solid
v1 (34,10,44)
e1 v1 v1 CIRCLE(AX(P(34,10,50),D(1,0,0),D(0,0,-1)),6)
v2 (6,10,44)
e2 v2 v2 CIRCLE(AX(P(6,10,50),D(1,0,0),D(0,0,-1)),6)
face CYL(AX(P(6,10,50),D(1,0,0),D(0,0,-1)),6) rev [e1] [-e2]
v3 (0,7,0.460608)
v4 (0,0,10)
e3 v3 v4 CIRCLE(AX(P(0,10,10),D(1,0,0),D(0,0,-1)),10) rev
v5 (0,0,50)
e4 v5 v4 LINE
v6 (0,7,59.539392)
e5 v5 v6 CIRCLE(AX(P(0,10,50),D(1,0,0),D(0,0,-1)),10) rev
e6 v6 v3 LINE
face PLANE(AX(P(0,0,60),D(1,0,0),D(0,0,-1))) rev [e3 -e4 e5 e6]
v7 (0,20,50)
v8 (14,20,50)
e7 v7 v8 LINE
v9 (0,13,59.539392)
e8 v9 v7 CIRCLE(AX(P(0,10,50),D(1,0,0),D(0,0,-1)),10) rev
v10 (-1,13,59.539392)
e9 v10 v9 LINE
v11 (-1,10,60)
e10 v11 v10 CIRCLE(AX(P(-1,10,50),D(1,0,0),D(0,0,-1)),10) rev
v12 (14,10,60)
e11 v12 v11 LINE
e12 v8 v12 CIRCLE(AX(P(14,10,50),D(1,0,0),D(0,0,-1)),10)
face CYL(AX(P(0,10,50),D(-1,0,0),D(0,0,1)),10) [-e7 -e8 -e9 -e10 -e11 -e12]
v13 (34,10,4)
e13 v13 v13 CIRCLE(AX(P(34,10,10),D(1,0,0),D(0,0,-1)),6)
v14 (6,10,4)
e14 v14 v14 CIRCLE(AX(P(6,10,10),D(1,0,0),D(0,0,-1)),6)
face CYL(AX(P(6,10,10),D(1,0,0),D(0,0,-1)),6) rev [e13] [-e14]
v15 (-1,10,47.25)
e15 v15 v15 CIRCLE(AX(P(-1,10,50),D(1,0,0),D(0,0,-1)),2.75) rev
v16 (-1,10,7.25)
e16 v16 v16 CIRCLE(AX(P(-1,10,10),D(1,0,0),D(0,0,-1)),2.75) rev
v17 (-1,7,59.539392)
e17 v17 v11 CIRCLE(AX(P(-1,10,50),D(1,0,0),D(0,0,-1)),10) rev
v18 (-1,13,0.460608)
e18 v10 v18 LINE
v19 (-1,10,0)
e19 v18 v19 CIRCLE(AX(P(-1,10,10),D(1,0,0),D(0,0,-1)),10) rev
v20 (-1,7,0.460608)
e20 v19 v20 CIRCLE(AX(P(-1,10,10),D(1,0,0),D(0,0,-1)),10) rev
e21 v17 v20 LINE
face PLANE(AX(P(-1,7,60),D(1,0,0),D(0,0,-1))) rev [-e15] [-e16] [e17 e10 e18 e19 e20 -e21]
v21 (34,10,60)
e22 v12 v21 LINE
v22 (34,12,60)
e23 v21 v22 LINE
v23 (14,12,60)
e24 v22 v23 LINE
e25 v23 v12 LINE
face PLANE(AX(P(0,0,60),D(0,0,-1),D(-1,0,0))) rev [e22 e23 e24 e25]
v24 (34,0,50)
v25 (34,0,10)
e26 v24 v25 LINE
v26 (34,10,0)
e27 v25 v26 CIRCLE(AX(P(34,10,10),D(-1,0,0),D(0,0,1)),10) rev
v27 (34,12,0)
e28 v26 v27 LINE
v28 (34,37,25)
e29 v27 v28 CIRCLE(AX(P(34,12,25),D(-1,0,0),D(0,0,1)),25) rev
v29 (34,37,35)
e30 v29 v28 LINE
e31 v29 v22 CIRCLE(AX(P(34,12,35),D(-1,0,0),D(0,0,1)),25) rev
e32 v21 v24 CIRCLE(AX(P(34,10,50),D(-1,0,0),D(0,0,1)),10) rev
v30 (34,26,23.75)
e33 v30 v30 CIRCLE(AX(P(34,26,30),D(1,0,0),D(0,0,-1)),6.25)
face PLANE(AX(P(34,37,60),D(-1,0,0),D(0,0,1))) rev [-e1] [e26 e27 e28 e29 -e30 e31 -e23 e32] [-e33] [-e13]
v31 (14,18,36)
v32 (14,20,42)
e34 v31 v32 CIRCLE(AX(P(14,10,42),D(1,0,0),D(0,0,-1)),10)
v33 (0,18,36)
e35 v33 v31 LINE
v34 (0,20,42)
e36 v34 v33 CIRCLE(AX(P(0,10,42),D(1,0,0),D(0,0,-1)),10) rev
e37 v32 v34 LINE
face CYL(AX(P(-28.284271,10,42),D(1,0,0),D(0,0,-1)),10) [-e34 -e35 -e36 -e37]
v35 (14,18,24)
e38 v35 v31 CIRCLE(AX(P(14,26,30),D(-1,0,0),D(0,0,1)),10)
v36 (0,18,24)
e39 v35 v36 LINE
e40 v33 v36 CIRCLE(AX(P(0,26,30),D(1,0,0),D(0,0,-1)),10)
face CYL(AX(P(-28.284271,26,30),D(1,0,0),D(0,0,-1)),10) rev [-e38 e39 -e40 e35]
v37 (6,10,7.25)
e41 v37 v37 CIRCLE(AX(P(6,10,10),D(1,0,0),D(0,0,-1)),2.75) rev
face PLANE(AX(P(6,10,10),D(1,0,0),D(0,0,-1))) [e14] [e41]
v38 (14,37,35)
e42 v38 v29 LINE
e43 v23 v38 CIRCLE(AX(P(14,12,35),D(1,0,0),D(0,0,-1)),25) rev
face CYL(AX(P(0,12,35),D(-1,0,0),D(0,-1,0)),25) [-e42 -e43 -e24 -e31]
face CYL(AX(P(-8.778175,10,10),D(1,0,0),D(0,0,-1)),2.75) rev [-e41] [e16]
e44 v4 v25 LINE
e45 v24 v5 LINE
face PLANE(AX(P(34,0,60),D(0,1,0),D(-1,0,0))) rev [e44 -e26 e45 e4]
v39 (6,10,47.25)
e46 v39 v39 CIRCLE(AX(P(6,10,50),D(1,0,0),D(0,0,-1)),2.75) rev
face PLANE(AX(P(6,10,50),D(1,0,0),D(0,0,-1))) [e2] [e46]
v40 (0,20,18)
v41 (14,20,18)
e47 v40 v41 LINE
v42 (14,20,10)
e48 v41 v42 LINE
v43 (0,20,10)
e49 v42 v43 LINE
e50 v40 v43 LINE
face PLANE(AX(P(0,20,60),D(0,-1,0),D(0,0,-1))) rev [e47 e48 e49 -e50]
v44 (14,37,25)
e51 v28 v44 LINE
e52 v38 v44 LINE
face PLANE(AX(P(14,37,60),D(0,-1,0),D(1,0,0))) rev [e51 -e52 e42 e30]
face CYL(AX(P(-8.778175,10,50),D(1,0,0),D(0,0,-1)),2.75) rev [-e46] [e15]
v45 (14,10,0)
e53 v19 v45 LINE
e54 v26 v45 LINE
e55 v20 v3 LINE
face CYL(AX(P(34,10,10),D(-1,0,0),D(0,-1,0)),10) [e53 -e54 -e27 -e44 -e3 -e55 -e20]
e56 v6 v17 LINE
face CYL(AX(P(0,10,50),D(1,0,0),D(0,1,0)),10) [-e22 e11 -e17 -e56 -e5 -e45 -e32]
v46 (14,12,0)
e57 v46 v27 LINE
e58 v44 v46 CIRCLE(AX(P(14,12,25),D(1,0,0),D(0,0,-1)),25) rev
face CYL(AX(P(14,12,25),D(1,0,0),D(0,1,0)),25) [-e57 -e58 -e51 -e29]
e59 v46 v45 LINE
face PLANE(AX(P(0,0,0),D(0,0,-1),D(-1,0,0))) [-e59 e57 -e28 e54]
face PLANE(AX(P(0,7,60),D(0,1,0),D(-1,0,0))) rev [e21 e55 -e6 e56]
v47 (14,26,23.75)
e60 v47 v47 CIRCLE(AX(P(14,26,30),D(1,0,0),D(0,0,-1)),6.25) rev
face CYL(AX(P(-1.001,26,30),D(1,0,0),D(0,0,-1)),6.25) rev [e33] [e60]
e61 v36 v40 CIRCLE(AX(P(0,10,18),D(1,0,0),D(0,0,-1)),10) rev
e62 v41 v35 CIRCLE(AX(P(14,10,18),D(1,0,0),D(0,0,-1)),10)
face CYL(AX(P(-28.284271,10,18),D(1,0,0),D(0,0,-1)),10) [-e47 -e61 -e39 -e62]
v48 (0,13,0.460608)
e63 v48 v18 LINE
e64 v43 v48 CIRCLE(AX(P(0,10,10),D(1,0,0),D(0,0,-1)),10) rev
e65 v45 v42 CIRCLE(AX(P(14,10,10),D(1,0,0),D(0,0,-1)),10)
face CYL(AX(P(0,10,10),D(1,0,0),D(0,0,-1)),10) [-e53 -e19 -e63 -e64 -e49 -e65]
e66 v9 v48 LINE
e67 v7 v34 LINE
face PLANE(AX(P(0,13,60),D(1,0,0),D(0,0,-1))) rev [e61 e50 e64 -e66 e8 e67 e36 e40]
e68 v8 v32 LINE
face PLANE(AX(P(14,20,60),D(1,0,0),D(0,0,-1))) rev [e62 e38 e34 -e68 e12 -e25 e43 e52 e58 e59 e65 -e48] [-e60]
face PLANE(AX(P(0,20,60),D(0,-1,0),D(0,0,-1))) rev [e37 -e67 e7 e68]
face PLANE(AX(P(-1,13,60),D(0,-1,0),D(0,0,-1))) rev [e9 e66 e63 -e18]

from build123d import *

# Parameters (mm, degrees)
SALIENTE_EXTRUIR1_DEPTH = 60
CROQUIS2_R              = 2.75
CORTAR_EXTRUIR1_DEPTH   = 35
CROQUIS3_R              = 6
CORTAR_EXTRUIR2_DEPTH   = 28
CORTAR_EXTRUIR3_REACH   = 80.702
CROQUIS4_R              = 6.25
CROQUIS5_R              = 10
CORTAR_EXTRUIR4_DEPTH   = 14
REDONDEO1_R             = 10
REDONDEO2_R             = 10
REDONDEO5_R             = 25


with BuildPart() as part:
    # Croquis1 → Saliente-Extruir1 (new body)
    with BuildSketch(Plane.XY):
        Polygon((0, 0), (0, 7), (-1, 7), (-1, 13), (0, 13), (0, 20), (14, 20), (14, 37), (34, 37), (34, 0), align=None)
    extrude(amount=SALIENTE_EXTRUIR1_DEPTH)

    # Croquis2 → Cortar-Extruir1 (cut)
    with BuildSketch(Plane(origin=(34, 0, 0), x_dir=(0, 0, -1), z_dir=(1, 0, 0))):
        with Locations((-50, 10)):
            Circle(CROQUIS2_R)
        with Locations((-10, 10)):
            Circle(CROQUIS2_R)
    extrude(amount=-CORTAR_EXTRUIR1_DEPTH, mode=Mode.SUBTRACT)

    # Croquis3 → Cortar-Extruir2 (cut)
    with BuildSketch(Plane(origin=(34, 0, 0), x_dir=(0, 0, -1), z_dir=(1, 0, 0))):
        with Locations((-50, 10)):
            Circle(CROQUIS3_R)
        with Locations((-10, 10)):
            Circle(CROQUIS3_R)
    extrude(amount=-CORTAR_EXTRUIR2_DEPTH, mode=Mode.SUBTRACT)

    # Croquis4 → Cortar-Extruir3 (cut, up to next)
    with BuildSketch(Plane(origin=(34, 0, 0), x_dir=(0, 0, -1), z_dir=(1, 0, 0)), mode=Mode.PRIVATE) as cortar_extruir3_sk1:
        with Locations((-30, 26)):
            Circle(CROQUIS4_R)
    cortar_extruir3_tool1 = extrude(cortar_extruir3_sk1.sketch, amount=-CORTAR_EXTRUIR3_REACH, mode=Mode.PRIVATE) & part.part
    add(cortar_extruir3_tool1.solids().sort_by_distance((34, 26, 30))[0], mode=Mode.SUBTRACT)

    # Croquis5 → Cortar-Extruir4 (cut)
    with BuildSketch(Plane.ZY.offset(-14)):
        with Locations((30, 26)):
            Circle(CROQUIS5_R)
    extrude(amount=CORTAR_EXTRUIR4_DEPTH, mode=Mode.SUBTRACT)

    # Redondeo1
    redondeo1_edges = [part.edges().sort_by_distance(p)[0] for p in [
        (7, 20, 22),
        (7, 20, 38),
    ]]
    fillet(redondeo1_edges, radius=REDONDEO1_R)

    # Redondeo2
    redondeo2_edges = [part.edges().sort_by_distance(p)[0] for p in [
        (17, 0, 60),
        (7, 20, 60),
        (17, 0, 0),
        (7, 20, 0),
    ]]
    fillet(redondeo2_edges, radius=REDONDEO2_R - 0.0001)  # a hair under: the kernel refuses the full size

    # Redondeo5
    redondeo5_edges = [part.edges().sort_by_distance(p)[0] for p in [
        (24, 37, 60),
        (24, 37, 0),
    ]]
    fillet(redondeo5_edges, radius=REDONDEO5_R)


solid = part.part
